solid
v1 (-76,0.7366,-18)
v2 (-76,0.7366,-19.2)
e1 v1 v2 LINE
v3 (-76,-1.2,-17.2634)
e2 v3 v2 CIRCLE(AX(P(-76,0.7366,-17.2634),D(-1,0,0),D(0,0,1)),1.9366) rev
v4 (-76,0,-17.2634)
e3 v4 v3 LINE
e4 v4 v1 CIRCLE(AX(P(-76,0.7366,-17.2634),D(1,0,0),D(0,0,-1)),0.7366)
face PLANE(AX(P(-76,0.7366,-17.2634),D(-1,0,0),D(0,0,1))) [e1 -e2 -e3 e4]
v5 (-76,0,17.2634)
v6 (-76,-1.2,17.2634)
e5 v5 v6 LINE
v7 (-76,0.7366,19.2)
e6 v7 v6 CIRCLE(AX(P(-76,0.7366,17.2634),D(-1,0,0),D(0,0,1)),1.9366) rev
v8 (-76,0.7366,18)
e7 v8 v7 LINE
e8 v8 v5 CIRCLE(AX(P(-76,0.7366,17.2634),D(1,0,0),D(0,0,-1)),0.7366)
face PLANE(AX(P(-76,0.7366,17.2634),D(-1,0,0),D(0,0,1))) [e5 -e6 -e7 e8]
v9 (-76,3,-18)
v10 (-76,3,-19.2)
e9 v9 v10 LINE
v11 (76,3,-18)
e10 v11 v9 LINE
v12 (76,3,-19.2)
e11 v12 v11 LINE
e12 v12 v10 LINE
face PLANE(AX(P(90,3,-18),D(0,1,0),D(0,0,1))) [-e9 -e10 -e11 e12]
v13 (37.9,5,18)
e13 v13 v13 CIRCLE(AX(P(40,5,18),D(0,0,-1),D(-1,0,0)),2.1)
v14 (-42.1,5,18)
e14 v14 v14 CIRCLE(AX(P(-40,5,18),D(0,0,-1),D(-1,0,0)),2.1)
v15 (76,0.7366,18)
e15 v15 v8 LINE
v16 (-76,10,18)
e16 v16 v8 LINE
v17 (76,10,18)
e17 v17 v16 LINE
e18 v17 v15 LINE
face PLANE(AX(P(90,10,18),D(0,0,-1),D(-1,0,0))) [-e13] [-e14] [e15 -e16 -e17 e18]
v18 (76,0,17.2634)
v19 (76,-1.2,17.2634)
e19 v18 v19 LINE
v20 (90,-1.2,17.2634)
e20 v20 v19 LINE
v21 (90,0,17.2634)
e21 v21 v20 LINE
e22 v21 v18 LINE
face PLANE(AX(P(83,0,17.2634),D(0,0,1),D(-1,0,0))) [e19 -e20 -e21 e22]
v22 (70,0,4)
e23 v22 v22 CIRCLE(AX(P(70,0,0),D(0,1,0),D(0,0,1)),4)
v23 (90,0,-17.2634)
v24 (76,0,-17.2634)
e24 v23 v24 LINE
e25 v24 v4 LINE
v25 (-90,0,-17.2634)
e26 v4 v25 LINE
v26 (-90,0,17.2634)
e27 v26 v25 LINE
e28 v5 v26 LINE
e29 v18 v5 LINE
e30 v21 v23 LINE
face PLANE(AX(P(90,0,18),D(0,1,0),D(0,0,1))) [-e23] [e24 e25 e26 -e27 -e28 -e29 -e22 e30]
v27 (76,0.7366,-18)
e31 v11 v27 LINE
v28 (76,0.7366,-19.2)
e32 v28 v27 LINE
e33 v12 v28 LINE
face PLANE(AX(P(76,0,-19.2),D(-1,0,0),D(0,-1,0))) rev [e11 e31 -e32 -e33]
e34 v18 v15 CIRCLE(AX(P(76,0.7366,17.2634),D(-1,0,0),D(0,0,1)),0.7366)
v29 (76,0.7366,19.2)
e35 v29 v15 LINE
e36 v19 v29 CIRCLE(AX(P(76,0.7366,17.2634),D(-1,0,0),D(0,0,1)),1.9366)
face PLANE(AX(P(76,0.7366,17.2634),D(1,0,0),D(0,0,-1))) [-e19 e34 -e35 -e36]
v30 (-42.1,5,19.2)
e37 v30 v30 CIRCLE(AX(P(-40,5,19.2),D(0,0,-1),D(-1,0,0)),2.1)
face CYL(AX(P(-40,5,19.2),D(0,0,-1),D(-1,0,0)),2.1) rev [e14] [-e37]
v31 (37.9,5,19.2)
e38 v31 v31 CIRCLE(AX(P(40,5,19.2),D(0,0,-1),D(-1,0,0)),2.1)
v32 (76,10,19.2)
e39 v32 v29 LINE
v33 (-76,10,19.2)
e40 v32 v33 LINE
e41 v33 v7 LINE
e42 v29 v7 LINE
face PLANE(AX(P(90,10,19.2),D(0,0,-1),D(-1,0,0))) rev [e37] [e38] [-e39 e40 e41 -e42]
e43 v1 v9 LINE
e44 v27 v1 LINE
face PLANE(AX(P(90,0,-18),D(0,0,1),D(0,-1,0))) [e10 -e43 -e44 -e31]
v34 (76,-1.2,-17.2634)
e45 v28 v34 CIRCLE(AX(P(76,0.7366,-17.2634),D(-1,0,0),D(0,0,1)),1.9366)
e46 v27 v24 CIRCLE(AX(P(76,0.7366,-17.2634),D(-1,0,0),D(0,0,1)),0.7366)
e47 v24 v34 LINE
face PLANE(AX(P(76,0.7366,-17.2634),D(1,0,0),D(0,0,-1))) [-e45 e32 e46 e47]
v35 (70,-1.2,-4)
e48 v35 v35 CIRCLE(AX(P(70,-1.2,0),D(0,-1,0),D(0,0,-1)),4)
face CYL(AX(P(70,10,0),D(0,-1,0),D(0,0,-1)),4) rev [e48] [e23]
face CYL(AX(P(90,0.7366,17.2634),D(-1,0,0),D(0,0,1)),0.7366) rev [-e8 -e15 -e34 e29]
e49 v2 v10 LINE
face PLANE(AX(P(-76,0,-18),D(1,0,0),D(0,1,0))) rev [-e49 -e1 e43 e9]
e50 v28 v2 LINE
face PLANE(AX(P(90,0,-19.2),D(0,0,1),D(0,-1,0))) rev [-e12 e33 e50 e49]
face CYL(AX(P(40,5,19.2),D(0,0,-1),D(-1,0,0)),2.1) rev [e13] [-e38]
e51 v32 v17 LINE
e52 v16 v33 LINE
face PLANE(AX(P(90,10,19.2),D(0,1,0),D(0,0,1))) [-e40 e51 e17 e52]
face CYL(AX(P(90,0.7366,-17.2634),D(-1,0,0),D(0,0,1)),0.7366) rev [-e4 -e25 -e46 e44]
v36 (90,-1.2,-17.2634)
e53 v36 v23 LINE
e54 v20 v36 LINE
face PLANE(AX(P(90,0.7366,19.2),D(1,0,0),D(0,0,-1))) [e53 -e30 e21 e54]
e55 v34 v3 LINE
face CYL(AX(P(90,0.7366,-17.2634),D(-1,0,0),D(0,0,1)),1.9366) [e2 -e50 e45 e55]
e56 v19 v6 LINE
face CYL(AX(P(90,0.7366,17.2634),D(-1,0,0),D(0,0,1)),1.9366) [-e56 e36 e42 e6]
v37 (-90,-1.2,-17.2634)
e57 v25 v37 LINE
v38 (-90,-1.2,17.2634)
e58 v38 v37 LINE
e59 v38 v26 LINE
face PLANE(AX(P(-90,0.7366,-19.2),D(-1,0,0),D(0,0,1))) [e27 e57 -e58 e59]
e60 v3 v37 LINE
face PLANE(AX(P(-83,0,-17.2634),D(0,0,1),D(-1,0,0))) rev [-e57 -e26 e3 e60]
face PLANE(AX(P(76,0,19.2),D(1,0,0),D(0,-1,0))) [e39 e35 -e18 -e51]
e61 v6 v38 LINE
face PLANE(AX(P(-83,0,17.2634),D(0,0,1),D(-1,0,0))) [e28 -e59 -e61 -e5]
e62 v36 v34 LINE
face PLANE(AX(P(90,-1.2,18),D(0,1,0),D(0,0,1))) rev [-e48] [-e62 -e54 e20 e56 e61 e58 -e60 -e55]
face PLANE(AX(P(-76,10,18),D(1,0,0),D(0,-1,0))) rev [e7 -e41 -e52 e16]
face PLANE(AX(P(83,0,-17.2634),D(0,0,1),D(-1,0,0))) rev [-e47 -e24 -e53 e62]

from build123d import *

# Parameters (mm, degrees)
FLANGE_BASE2_DEPTH      = 90
CORTE_EXTRUS_O3_START   = -90
CORTE_EXTRUS_O3_DEPTH   = 14
CORTE_EXTRUS_O3_START_2 = 76
CORTE_EXTRUS_O3_2_DEPTH = 14
ESBO_O13_R              = 4
CORTE_EXTRUS_O4_DEPTH   = 93.704260959
ESBO_O14_R              = 2.1
CORTE_EXTRUS_O5_DEPTH   = 98.897088823


# Read off the part's stored shape, not the designer's step: Corte-extrusão3
# Sheet-metal steps are written as plain solids
with BuildPart() as part:
    # Esboço1 → Flange-base2 (new, symmetric)
    with BuildSketch(Plane(origin=(0, 0, 0), x_dir=(0, 0, -1), z_dir=(1, 0, 0))):
        with BuildLine():
            Line((-18, 10), (-18, 0.7366))
            ThreePointArc((-18, 0.7366), (-17.784254855, 0.215745145), (-17.2634, 0))
            Line((-17.2634, 0), (17.2634, 0))
            ThreePointArc((17.2634, 0), (17.784254855, 0.215745145), (18, 0.7366))
            Line((18, 0.7366), (18, 3))
            Line((18, 3), (19.2, 3))
            Line((19.2, 3), (19.2, 0.7366))
            ThreePointArc((19.2, 0.7366), (18.632782992, -0.632782992), (17.2634, -1.2))
            Line((17.2634, -1.2), (-17.2634, -1.2))
            ThreePointArc((-17.2634, -1.2), (-18.632782992, -0.632782992), (-19.2, 0.7366))
            Line((-19.2, 0.7366), (-19.2, 10))
            Line((-19.2, 10), (-18, 10))
        make_face()
    extrude(amount=FLANGE_BASE2_DEPTH, both=True)

    # Corte-extrusão3 outline → Corte-extrusão3 (cut)
    with BuildSketch(Plane.YZ.offset(CORTE_EXTRUS_O3_START)):
        with BuildLine():
            Line((-1.2, 17.2634), (0, 17.2634))
            ThreePointArc((0, 17.2634), (0.215745145, 17.784254855), (0.7366, 18))
            Line((0.7366, 18), (10, 18))
            Line((10, 18), (10, 19.2))
            Line((10, 19.2), (0.7366, 19.2))
            ThreePointArc((0.7366, 19.2), (-0.632782992, 18.632782992), (-1.2, 17.2634))
        make_face()
        with BuildLine():
            ThreePointArc((0.7366, -18), (0.215745145, -17.784254855), (0, -17.2634))
            Line((0, -17.2634), (-1.2, -17.2634))
            ThreePointArc((-1.2, -17.2634), (-0.632782992, -18.632782992), (0.7366, -19.2))
            Line((0.7366, -19.2), (3, -19.2))
            Line((3, -19.2), (3, -18))
            Line((3, -18), (0.7366, -18))
        make_face()
    extrude(amount=CORTE_EXTRUS_O3_DEPTH, mode=Mode.SUBTRACT)

    # Corte-extrus_o3 2 outline → Corte-extrus_o3 2 (cut)
    with BuildSketch(Plane.YZ.offset(CORTE_EXTRUS_O3_START_2)):
        with BuildLine():
            Line((-1.2, 17.2634), (0, 17.2634))
            ThreePointArc((0, 17.2634), (0.215745145, 17.784254855), (0.7366, 18))
            Line((0.7366, 18), (10, 18))
            Line((10, 18), (10, 19.2))
            Line((10, 19.2), (0.7366, 19.2))
            ThreePointArc((0.7366, 19.2), (-0.632782992, 18.632782992), (-1.2, 17.2634))
        make_face()
        with BuildLine():
            ThreePointArc((0.7366, -18), (0.215745145, -17.784254855), (0, -17.2634))
            Line((0, -17.2634), (-1.2, -17.2634))
            ThreePointArc((-1.2, -17.2634), (-0.632782992, -18.632782992), (0.7366, -19.2))
            Line((0.7366, -19.2), (3, -19.2))
            Line((3, -19.2), (3, -18))
            Line((3, -18), (0.7366, -18))
        make_face()
    extrude(amount=CORTE_EXTRUS_O3_2_DEPTH, mode=Mode.SUBTRACT)

    # Esboço13 → Corte-extrusão4 (cut, through all)
    with BuildSketch(Plane.XZ.offset(1.2)):
        with Locations(Location((70, 0, 0), (0, 0, 270))):
            Circle(ESBO_O13_R)
    extrude(amount=-CORTE_EXTRUS_O4_DEPTH, mode=Mode.SUBTRACT)

    # Esboço14 → Corte-extrusão5 (cut, through all)
    with BuildSketch(Plane(origin=(0, 0, 18), x_dir=(-1, 0, 0), z_dir=(0, 0, -1))):
        with Locations((-40, 5)):
            Circle(ESBO_O14_R)
        with Locations((40, 5)):
            Circle(ESBO_O14_R)
    extrude(amount=-CORTE_EXTRUS_O5_DEPTH, mode=Mode.SUBTRACT)


solid = part.part
